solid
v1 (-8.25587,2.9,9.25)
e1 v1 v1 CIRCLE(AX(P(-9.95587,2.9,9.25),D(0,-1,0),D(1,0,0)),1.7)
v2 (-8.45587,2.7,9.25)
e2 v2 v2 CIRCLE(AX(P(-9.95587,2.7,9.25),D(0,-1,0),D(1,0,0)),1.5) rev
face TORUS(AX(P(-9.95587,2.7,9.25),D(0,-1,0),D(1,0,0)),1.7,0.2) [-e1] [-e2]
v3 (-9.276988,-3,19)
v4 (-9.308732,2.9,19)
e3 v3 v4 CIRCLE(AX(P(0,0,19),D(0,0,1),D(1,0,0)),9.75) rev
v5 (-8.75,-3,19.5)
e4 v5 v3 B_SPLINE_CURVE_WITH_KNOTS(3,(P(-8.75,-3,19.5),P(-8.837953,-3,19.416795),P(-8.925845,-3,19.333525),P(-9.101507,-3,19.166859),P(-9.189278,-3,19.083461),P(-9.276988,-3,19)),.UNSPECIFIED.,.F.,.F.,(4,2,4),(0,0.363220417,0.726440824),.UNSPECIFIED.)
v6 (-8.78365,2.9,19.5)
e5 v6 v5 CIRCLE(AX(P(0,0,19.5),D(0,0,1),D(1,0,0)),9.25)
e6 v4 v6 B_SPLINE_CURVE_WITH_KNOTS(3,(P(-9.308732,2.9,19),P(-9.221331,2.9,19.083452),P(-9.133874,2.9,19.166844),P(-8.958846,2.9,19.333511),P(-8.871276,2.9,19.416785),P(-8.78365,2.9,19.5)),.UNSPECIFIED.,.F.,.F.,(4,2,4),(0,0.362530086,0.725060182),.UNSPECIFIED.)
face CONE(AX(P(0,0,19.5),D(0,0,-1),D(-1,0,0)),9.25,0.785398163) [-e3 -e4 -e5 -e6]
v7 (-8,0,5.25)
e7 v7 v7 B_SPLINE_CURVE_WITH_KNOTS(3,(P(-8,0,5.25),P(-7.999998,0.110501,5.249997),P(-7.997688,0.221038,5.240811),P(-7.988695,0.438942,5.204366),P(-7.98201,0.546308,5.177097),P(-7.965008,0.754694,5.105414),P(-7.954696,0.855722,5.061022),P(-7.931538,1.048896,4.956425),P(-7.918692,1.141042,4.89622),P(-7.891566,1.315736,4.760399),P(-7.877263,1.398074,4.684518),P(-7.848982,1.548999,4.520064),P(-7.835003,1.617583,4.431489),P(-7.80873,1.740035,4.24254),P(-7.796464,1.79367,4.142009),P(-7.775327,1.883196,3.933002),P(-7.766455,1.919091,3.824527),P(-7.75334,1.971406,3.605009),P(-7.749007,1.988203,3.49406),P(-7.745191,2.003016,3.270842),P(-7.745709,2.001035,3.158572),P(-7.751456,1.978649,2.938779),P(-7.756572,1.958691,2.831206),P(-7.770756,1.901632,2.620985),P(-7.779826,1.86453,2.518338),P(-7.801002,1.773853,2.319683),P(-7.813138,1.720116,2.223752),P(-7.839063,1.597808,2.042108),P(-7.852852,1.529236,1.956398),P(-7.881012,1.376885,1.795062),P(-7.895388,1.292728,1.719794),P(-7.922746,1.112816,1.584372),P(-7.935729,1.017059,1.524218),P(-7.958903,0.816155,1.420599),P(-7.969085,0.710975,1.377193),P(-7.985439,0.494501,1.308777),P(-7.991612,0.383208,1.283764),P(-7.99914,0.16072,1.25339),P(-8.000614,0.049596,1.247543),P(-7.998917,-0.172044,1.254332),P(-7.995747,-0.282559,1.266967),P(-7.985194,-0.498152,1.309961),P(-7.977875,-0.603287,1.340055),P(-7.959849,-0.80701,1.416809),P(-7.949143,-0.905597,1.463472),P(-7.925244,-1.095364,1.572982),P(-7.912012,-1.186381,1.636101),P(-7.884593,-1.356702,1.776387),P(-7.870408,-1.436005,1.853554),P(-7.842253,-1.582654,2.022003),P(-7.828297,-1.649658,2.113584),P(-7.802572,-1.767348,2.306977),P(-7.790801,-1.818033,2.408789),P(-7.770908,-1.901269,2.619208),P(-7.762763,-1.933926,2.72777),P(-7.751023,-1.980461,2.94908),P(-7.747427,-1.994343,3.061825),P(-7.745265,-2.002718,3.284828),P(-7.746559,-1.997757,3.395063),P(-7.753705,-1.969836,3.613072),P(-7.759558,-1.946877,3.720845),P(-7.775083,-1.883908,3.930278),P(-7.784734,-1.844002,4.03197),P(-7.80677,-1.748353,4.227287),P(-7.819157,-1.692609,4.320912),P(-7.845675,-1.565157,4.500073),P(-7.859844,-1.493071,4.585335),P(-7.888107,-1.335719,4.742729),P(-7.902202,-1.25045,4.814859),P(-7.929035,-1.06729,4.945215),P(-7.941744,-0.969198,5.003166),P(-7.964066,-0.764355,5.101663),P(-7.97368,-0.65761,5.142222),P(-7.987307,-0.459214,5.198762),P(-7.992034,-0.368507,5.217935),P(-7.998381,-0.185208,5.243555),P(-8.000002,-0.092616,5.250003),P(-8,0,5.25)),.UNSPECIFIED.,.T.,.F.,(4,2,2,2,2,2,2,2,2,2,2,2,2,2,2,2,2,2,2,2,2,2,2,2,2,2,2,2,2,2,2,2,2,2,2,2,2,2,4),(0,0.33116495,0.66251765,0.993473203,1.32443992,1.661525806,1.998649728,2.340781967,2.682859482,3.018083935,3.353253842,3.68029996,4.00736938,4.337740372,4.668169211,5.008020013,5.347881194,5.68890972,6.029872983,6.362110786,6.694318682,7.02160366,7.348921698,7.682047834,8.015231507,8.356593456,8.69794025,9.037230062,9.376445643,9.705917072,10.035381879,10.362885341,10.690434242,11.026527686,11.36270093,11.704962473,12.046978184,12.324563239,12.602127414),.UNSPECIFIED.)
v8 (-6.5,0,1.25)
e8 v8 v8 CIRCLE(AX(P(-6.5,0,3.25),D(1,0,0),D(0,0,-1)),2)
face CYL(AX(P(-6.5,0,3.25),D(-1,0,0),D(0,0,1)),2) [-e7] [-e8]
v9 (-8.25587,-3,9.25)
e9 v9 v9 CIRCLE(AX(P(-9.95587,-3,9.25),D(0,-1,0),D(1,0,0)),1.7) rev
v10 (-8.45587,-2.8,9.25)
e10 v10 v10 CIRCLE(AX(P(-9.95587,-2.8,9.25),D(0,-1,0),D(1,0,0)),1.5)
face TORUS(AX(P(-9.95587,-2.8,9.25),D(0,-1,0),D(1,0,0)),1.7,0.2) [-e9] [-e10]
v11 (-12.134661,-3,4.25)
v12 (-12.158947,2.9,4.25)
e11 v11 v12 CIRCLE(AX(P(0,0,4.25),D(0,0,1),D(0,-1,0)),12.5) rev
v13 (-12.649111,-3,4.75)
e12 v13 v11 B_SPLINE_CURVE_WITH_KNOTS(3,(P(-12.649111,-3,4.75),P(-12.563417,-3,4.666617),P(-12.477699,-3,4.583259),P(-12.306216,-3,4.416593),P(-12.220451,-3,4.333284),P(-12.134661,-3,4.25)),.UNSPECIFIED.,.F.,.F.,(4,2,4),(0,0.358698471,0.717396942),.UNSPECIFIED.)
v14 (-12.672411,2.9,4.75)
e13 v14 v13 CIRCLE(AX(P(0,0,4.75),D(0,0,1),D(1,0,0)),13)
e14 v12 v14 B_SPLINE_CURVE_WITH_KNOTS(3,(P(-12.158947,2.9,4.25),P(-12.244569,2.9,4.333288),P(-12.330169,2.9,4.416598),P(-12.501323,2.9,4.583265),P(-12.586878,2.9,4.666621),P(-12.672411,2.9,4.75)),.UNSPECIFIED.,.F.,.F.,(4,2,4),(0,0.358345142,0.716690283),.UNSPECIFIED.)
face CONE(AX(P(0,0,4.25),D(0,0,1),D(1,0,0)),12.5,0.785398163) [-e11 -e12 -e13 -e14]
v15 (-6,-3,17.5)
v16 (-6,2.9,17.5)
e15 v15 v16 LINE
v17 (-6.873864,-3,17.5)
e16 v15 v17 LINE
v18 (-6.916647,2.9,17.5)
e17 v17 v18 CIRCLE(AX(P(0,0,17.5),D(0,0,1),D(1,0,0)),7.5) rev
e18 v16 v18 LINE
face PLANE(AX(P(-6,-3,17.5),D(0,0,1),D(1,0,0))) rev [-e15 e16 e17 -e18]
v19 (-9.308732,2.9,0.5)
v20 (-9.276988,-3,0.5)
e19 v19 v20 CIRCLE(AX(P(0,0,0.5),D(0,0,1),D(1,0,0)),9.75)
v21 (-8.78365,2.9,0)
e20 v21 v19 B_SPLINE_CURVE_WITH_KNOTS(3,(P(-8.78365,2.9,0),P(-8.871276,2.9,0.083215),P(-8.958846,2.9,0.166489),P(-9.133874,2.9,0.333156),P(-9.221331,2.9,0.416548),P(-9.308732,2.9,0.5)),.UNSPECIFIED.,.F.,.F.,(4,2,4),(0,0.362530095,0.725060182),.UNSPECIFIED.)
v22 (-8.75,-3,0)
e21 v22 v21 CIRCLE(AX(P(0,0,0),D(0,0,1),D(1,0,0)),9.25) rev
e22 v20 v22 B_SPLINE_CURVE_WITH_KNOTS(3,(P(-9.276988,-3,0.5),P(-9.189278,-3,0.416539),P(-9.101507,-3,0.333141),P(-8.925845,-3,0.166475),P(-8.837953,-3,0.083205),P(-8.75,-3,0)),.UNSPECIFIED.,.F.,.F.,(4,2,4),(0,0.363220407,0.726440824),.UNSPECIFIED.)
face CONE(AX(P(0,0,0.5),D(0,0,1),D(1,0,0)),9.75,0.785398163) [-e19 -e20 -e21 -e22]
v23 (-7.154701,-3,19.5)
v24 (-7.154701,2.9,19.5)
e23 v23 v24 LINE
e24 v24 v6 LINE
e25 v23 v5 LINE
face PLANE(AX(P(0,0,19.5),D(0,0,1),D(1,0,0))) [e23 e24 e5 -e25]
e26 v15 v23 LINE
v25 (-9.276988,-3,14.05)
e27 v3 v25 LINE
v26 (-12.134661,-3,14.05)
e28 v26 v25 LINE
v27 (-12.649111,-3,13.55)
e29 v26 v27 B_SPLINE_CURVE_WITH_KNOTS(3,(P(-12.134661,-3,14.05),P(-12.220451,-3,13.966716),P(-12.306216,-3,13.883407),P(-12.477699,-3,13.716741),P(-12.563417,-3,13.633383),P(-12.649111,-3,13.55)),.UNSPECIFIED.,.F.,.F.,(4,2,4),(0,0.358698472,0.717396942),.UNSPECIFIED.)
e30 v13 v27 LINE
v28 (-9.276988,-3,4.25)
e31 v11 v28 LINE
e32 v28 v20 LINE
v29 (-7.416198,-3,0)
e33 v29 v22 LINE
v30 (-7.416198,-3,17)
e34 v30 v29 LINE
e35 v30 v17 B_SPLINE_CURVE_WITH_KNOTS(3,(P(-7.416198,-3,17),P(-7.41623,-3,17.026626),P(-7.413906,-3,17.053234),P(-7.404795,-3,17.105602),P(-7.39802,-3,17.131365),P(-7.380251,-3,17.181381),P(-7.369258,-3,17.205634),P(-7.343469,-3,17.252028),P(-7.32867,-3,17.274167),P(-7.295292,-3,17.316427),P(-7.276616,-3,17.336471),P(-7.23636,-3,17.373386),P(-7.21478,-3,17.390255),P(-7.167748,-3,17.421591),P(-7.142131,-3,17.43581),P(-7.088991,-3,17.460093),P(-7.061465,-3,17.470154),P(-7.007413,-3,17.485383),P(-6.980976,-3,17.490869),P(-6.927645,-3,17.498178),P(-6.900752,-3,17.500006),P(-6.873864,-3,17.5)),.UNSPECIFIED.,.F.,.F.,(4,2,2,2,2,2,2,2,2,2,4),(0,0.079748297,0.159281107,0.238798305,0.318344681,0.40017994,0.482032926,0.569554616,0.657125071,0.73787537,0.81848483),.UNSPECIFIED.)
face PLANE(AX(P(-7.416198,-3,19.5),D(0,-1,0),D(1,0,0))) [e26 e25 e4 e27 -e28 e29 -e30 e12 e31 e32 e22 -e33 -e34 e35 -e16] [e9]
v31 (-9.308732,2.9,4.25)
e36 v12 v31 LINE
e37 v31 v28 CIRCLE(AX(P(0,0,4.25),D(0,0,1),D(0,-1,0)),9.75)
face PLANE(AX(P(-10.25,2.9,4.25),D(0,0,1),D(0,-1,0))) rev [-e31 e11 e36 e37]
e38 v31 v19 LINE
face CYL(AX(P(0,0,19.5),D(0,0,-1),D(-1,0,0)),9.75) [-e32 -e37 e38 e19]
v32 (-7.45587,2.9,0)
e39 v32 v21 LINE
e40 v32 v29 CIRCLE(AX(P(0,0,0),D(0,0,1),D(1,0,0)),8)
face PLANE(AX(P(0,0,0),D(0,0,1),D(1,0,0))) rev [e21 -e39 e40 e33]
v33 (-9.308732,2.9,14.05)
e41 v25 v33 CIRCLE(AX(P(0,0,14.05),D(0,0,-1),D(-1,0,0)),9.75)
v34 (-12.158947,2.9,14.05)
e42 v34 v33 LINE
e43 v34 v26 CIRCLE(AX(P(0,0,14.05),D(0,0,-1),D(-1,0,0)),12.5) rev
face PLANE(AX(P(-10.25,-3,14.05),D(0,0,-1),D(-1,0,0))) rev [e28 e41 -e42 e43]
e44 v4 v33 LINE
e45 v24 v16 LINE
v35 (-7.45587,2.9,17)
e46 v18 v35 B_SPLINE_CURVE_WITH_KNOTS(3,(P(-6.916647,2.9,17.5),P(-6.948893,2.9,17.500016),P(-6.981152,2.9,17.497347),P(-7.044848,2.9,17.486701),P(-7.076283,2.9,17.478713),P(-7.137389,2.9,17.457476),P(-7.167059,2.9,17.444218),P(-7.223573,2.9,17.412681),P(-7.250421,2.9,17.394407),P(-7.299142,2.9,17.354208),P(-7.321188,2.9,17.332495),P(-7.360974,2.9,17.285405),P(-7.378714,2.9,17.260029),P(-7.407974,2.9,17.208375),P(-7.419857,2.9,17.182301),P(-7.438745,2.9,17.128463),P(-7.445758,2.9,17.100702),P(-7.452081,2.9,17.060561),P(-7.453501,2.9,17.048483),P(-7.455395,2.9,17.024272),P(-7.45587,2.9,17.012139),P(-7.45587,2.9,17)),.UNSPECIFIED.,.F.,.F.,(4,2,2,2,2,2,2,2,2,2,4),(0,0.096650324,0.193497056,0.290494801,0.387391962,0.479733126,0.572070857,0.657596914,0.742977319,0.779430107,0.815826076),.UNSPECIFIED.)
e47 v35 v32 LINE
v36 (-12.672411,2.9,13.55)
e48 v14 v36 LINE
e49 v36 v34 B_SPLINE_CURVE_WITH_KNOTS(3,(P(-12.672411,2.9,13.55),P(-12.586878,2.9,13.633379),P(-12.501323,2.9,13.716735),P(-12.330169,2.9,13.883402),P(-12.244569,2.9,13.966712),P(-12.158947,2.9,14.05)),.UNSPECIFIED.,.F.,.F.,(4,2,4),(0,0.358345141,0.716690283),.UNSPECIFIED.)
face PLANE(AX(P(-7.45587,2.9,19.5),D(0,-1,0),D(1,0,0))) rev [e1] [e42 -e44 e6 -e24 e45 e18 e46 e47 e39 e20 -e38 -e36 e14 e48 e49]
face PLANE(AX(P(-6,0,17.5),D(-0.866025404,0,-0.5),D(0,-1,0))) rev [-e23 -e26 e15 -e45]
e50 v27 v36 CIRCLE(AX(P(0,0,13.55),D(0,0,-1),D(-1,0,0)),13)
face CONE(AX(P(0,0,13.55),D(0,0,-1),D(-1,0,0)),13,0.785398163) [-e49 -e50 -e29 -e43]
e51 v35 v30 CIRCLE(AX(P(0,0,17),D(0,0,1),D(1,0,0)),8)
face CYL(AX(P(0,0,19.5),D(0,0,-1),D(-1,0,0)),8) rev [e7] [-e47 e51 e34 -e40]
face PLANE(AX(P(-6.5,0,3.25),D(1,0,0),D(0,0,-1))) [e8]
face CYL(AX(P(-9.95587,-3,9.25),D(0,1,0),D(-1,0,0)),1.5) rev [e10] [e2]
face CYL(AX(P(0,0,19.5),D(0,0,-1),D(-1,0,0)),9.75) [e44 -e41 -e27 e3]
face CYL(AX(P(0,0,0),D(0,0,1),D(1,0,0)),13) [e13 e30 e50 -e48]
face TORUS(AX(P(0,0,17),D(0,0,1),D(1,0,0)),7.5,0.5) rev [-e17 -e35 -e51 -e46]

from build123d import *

# Parameters (mm, degrees)
EXTRUDE_2_DEPTH     = 19.5
SKETCH_3_R          = 2
EXTRUDE_3_DEPTH     = 1.5
SKETCH_4_W          = 9.8
SKETCH_4_H          = 5.9
EXTRUDE_4_DEPTH     = 0.5
SKETCH_4_3_W        = 9.8
SKETCH_4_3_H        = 5.9
EXTRUDE_5_DEPTH     = 8
CUT_EXTRUDE_1_DEPTH = 23.835608234
SKETCH_7_R          = 1.5
CUT_EXTRUDE_2_DEPTH = 25.167333429
FILLET_1_R          = 0.2
SKETCH_8_W          = 2
SKETCH_8_H          = 5.9
EXTRUDE_6_DEPTH     = 2
CHAMFER_1_SIZE2     = 2
CHAMFER_1_SIZE      = 1.154700538
FILLET_2_R          = 0.5
CHAMFER_2_SIZE      = 0.5


with BuildPart() as part:
    # 스케치2 → 보스-돌출2 (new body)
    with BuildSketch(Plane.XY):
        with BuildLine():
            Line((-7.455870171, 2.9), (-9.308732459, 2.9))
            ThreePointArc((-9.308732459, 2.9), (-9.749858874, -0.052458871), (-9.276987658, -3))
            Line((-9.276987658, -3), (-7.416198487, -3))
            ThreePointArc((-7.416198487, -3), (-7.999819157, -0.053790897), (-7.455870171, 2.9))
        make_face()
    extrude(amount=EXTRUDE_2_DEPTH)

    # 스케치3 → 보스-돌출3 (add)
    with BuildSketch(Plane(origin=(-8, 0, 0), x_dir=(0, 0, -1), z_dir=(1, 0, 0))):
        with Locations(Location((-3.25, 0, 0), (0, 0, 180))):
            Circle(SKETCH_3_R)
    extrude(amount=EXTRUDE_3_DEPTH)

    # 스케치4 → 보스-돌출4 (add, symmetric)
    with BuildSketch(Plane.ZY.offset(9.75)):
        with Locations((9.15, -0.05)):
            Rectangle(SKETCH_4_W, SKETCH_4_H)
    extrude(amount=EXTRUDE_4_DEPTH, both=True)

    # 스케치4<3> → 보스-돌출5 (add)
    with BuildSketch(Plane.ZY.offset(9.75)):
        with Locations((9.15, -0.05)):
            Rectangle(SKETCH_4_3_W, SKETCH_4_3_H)
    extrude(amount=EXTRUDE_5_DEPTH)

    # 스케치6 → 컷-돌출1 (cut, through all)
    with BuildSketch(Plane.XY.offset(14.05)):
        with BuildLine():
            Line((-12.672410978, 2.9), (-17.75, 2.9))
            Line((-17.75, 2.9), (-17.75, -3))
            Line((-17.75, -3), (-12.649110641, -3))
            ThreePointArc((-12.649110641, -3), (-12.999898626, -0.051339326), (-12.672410978, 2.9))
        make_face()
    extrude(amount=-CUT_EXTRUDE_1_DEPTH, mode=Mode.SUBTRACT)

    # 스케치7 → 컷-돌출2 (cut, through all)
    with BuildSketch(Plane(origin=(0, 2.9, 0), x_dir=(1, 0, 0), z_dir=(0, 1, 0))):
        with Locations(Location((-9.955870171, -9.25, 0), (0, 0, 180))):
            Circle(SKETCH_7_R)
    extrude(amount=-CUT_EXTRUDE_2_DEPTH, mode=Mode.SUBTRACT)

    # 필렛1
    fillet_1_edges = [part.edges().sort_by_distance(p)[0] for p in [
        (-8.455870171, -3, 9.25),
        (-8.455870171, 2.9, 9.25),
    ]]
    fillet(fillet_1_edges, radius=FILLET_1_R)

    # 스케치8 → 보스-돌출6 (add)
    with BuildSketch(Plane(origin=(-8, 0, 0), x_dir=(0, 0, -1), z_dir=(1, 0, 0))):
        with Locations((-18.5, -0.05)):
            Rectangle(SKETCH_8_W, SKETCH_8_H)
    extrude(amount=EXTRUDE_6_DEPTH)

    # 모따기1
    chamfer_1_edges = [part.edges().sort_by_distance(p)[0] for p in [
        (-6, -0.05, 19.5),
    ]]
    chamfer_1_side = [part.faces().sort_by_distance(p)[0] for p in [
        (-6.023094011, -0.05, 19.5),
    ]]
    chamfer(chamfer_1_edges, length=CHAMFER_1_SIZE - 0.0001, length2=CHAMFER_1_SIZE2 - 0.0001, reference=chamfer_1_side[0])  # a hair under: the kernel refuses the full size

    # 필렛2
    fillet_2_edges = [part.edges().sort_by_distance(p)[0] for p in [
        (-7.999819157, -0.053790897, 17.5),
    ]]
    fillet(fillet_2_edges, radius=FILLET_2_R)

    # 모따기2
    chamfer_2_edges = [part.edges().sort_by_distance(p)[0] for p in [
        (-9.749858874, -0.052458871, 0),
        (-12.999898626, -0.051339326, 4.25),
        (-12.999898626, -0.051339326, 14.05),
        (-9.749858874, -0.052458871, 19.5),
    ]]
    chamfer(chamfer_2_edges, length=CHAMFER_2_SIZE)


solid = part.part
